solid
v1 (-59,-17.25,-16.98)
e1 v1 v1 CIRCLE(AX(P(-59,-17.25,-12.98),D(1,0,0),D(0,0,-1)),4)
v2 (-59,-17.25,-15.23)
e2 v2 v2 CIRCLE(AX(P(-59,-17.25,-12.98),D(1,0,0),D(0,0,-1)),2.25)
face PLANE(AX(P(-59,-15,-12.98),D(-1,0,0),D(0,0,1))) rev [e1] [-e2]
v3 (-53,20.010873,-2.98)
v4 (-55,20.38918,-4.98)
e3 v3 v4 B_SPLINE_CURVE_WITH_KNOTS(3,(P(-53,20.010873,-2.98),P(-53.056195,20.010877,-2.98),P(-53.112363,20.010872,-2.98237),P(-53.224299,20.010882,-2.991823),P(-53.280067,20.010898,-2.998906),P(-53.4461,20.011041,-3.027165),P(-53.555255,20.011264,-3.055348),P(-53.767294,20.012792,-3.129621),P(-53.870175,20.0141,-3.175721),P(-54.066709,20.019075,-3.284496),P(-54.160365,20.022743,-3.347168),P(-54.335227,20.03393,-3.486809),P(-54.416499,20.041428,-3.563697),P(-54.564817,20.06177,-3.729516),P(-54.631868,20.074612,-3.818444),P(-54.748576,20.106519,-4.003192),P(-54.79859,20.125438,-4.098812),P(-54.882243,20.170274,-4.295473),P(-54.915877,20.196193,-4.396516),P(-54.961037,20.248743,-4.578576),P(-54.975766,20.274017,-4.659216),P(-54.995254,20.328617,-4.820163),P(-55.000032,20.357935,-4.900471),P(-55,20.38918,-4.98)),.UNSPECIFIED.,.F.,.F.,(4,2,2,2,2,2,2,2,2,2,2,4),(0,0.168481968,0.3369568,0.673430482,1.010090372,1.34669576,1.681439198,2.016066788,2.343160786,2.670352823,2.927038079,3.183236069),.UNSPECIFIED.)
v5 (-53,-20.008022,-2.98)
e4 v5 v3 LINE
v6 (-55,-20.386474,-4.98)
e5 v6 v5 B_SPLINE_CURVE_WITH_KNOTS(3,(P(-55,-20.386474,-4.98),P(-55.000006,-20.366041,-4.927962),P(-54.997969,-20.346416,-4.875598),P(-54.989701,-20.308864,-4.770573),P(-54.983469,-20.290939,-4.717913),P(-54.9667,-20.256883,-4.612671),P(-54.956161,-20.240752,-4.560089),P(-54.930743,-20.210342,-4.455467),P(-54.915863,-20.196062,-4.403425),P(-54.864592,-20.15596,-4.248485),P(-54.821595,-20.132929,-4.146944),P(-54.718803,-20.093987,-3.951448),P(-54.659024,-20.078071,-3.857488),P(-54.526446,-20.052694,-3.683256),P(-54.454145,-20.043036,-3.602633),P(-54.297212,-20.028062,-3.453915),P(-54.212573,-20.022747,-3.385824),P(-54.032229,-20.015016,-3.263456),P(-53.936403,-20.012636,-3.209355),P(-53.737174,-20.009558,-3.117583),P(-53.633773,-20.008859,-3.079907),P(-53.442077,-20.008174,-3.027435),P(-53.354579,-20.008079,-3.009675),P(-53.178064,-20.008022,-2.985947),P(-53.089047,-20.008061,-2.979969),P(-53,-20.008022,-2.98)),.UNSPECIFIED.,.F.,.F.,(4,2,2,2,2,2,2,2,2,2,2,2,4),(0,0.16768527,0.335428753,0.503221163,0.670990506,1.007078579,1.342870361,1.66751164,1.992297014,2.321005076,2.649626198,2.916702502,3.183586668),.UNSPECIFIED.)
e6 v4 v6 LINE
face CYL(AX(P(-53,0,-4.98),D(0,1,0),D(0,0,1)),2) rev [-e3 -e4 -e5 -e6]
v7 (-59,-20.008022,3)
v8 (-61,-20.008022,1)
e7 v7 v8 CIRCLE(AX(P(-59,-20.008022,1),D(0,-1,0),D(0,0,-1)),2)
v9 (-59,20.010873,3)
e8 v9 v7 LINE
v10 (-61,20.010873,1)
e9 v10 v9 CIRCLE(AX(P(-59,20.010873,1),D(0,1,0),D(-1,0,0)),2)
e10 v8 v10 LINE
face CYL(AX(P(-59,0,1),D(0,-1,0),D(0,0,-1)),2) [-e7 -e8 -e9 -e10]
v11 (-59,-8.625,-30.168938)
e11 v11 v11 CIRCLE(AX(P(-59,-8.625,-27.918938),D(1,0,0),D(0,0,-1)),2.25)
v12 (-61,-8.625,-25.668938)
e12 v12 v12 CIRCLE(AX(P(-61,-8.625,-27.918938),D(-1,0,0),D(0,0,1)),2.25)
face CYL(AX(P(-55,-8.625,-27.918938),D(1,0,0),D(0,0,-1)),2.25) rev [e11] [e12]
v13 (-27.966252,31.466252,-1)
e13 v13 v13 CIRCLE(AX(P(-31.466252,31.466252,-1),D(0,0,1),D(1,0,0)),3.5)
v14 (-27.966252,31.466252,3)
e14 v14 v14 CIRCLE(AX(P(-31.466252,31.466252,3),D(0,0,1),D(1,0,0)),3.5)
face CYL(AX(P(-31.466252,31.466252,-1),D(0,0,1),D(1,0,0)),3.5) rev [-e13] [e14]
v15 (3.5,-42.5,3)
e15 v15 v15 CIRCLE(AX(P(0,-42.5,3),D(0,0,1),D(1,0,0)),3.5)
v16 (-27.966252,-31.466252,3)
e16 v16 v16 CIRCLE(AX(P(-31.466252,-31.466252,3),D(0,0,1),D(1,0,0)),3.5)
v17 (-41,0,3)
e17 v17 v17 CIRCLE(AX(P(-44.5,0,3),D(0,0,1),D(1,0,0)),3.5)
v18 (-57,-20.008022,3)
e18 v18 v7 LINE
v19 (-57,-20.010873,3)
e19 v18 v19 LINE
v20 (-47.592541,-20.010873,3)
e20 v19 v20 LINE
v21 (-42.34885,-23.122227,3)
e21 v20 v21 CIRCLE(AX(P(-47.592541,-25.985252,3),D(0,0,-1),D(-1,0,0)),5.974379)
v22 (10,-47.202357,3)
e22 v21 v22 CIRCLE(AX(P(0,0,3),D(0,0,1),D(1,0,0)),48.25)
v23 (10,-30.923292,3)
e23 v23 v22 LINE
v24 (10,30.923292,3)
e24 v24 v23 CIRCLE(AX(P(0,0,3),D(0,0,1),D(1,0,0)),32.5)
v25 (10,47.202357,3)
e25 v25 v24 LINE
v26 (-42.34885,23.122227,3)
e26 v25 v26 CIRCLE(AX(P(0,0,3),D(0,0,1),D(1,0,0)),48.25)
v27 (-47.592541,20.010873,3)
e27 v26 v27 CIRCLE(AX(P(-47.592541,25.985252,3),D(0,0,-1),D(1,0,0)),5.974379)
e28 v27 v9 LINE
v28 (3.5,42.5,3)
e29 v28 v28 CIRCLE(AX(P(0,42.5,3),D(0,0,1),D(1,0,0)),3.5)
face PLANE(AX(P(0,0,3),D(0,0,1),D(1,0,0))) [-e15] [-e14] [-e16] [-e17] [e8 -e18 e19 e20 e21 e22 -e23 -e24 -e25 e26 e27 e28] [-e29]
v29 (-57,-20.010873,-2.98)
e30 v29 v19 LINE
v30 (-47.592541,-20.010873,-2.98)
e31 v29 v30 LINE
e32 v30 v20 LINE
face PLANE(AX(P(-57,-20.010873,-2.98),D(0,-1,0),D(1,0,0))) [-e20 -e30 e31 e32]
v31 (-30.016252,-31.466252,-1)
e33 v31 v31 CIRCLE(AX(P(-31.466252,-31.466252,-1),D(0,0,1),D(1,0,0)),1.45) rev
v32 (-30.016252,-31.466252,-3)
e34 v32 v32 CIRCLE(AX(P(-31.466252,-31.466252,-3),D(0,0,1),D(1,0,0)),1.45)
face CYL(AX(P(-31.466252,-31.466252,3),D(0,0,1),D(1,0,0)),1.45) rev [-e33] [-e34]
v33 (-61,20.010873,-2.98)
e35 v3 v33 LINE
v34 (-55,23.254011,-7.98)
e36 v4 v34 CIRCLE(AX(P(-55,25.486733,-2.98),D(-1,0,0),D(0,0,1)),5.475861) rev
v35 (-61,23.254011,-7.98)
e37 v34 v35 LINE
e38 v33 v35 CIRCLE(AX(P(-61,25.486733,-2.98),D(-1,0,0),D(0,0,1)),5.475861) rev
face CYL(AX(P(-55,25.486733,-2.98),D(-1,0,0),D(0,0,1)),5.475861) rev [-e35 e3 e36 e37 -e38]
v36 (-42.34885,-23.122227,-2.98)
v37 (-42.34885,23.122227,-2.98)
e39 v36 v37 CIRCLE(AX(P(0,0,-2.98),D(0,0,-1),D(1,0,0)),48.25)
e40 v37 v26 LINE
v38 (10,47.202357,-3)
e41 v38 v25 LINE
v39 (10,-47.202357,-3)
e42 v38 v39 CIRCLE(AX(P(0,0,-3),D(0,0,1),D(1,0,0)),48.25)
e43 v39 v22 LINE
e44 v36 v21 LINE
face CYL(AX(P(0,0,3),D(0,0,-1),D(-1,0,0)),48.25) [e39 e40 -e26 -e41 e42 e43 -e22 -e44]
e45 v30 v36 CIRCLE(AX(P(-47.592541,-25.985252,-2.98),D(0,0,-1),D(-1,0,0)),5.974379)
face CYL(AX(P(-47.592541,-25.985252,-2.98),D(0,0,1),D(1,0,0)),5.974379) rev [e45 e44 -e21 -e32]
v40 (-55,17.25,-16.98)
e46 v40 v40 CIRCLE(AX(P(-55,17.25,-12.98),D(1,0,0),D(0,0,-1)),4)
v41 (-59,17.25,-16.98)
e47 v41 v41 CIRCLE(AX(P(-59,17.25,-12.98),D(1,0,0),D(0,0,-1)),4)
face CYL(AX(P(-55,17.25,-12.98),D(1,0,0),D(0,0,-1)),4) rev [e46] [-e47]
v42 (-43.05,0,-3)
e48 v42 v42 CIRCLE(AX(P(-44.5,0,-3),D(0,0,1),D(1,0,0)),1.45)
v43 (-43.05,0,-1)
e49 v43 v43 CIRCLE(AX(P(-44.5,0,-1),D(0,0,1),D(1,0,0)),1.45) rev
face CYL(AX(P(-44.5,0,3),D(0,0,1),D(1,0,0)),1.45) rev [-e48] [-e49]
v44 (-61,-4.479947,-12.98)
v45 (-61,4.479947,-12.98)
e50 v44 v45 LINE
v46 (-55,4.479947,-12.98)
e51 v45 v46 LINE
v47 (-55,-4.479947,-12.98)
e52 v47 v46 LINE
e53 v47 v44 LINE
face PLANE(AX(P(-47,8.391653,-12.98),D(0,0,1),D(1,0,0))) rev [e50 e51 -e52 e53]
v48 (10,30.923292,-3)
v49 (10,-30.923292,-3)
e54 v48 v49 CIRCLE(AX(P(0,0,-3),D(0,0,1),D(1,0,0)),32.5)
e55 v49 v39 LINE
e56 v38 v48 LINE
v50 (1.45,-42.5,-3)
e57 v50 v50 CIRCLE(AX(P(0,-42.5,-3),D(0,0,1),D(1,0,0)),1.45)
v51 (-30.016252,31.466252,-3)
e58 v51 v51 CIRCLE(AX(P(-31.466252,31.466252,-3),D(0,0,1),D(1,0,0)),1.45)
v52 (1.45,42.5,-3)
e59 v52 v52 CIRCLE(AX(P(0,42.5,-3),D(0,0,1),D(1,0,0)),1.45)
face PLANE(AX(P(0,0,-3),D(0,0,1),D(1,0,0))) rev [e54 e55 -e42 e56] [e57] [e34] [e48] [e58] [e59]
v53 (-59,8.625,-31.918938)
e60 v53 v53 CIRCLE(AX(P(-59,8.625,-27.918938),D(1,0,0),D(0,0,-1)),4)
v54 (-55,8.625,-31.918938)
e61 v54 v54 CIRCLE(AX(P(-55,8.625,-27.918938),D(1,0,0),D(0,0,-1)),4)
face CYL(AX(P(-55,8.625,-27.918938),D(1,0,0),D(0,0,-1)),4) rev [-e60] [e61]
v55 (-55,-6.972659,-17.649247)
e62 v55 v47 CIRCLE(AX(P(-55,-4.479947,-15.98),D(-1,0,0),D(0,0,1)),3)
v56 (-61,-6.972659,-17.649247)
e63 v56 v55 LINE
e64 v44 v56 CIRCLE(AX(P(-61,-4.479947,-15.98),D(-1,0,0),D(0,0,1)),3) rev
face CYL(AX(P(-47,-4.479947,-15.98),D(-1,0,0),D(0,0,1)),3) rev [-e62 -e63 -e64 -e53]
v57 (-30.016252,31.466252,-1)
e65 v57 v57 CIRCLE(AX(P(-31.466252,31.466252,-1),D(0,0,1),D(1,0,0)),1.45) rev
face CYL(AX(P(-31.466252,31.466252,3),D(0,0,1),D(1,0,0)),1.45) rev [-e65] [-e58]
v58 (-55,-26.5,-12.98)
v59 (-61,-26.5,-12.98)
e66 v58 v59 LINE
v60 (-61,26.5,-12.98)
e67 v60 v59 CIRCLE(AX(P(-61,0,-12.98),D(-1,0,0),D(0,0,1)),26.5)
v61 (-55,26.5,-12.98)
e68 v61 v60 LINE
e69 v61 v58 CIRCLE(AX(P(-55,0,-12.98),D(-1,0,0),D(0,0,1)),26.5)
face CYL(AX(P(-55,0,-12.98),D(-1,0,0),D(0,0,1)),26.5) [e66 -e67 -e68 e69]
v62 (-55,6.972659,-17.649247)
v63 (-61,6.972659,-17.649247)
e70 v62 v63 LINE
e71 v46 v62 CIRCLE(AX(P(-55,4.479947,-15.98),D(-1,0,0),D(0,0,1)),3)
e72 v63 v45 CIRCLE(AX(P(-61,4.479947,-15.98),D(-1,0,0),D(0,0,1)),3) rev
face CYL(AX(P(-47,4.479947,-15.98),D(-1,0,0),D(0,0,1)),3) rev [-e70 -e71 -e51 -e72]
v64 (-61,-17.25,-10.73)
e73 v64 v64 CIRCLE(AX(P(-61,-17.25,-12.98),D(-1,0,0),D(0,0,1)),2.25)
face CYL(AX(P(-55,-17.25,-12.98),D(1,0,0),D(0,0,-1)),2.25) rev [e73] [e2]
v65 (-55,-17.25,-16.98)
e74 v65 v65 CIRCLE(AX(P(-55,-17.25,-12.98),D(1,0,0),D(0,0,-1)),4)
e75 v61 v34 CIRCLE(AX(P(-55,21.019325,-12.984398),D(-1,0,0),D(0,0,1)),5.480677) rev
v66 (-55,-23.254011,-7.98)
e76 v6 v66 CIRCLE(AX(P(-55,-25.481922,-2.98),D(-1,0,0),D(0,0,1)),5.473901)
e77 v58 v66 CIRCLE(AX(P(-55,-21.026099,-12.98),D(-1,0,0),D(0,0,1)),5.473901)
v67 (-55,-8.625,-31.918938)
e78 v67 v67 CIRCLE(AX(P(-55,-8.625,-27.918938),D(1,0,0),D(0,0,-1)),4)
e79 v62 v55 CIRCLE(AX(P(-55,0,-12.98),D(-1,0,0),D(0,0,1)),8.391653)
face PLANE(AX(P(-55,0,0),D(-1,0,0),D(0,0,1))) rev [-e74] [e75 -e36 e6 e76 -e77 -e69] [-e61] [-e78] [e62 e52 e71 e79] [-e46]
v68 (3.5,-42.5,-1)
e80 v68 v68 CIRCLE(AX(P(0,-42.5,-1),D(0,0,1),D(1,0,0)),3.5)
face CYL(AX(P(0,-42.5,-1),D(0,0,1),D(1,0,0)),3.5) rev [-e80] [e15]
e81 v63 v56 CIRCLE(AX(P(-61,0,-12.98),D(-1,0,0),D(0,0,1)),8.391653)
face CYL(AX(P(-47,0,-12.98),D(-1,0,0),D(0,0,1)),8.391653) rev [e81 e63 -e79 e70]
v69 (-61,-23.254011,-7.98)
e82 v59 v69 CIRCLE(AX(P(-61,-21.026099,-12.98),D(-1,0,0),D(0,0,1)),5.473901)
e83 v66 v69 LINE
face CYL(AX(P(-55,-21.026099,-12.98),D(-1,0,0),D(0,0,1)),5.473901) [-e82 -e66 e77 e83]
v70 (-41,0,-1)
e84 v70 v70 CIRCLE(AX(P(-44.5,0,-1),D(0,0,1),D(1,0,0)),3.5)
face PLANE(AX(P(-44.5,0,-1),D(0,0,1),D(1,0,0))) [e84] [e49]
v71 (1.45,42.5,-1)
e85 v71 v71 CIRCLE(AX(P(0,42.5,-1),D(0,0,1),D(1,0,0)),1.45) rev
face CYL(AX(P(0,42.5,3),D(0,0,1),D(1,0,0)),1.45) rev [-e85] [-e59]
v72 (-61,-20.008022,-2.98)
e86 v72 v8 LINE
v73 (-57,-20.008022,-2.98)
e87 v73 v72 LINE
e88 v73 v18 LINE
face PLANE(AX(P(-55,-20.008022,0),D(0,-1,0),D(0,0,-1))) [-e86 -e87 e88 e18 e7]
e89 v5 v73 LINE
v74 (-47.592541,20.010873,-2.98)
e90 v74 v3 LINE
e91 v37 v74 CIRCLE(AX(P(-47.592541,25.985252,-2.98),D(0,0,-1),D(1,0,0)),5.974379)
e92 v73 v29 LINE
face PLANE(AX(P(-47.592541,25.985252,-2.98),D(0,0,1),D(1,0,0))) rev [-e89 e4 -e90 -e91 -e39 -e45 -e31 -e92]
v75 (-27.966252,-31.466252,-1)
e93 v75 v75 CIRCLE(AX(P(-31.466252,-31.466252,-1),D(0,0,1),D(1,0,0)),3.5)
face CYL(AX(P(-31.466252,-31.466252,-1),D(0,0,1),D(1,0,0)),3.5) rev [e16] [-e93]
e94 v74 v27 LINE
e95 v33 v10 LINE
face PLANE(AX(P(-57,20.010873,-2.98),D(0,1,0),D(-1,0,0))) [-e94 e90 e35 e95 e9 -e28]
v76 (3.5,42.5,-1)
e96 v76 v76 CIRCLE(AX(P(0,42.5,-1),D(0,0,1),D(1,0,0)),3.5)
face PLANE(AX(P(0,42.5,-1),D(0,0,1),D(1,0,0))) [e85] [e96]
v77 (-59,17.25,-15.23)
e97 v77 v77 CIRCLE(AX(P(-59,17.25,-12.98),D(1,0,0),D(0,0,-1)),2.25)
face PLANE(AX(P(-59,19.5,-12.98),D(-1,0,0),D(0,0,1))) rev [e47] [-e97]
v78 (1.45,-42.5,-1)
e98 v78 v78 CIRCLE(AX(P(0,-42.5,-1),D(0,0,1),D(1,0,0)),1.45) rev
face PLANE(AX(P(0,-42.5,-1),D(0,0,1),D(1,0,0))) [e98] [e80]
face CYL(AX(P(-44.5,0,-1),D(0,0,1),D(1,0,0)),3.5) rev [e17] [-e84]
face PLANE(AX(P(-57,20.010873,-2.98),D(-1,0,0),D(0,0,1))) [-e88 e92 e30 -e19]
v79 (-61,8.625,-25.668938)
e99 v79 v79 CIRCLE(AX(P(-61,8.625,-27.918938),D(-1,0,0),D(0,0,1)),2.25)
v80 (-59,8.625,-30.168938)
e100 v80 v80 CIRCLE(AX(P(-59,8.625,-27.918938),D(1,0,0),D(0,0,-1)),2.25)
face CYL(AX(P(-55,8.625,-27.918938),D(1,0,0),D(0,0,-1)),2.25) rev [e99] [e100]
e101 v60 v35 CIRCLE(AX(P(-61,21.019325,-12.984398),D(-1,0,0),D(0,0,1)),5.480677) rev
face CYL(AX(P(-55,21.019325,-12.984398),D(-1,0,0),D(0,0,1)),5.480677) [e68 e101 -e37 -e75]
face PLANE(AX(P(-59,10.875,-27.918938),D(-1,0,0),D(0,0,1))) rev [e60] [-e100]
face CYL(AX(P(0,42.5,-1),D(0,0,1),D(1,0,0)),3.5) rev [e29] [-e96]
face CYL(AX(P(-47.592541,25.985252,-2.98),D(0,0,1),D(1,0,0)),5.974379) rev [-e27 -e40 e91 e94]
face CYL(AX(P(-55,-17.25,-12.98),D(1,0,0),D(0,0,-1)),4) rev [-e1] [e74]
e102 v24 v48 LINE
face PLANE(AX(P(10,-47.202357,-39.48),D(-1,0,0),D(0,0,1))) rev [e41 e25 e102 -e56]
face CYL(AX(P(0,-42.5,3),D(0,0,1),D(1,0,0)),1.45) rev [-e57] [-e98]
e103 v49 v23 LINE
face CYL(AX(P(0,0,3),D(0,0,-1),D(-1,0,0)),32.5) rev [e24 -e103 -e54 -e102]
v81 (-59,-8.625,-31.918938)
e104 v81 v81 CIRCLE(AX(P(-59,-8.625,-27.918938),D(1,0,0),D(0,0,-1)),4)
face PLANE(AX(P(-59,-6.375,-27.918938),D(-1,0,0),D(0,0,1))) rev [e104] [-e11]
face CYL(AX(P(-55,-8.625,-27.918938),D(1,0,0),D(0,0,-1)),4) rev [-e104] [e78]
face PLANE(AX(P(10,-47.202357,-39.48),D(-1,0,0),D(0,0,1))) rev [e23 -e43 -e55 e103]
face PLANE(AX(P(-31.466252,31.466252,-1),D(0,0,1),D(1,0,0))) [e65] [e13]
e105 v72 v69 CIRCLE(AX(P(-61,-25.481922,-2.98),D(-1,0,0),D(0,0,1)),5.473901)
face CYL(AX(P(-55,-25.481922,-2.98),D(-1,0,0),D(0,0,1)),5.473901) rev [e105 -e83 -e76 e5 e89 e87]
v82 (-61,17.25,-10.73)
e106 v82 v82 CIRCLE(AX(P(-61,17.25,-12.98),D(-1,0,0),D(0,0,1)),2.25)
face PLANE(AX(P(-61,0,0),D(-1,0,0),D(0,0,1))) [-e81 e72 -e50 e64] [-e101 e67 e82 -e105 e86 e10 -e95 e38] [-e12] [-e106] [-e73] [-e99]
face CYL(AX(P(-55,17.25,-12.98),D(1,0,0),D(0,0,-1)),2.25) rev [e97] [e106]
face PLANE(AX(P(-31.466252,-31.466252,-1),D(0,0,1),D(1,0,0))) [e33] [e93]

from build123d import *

# Parameters (mm, degrees)
SKETCH_3_R                   = 48.25
SKETCH_3_R_2                 = 32.5
EXTRUDE_2_DEPTH              = 3
SKETCH_5_R                   = 41.525287223
SKETCH_5_R_2                 = 39.197474278
EXTRUDE_3_DEPTH              = 0.1
EXTRUDE_START                = -3
SKETCH_2_R                   = 48.25
SKETCH_2_R_2                 = 32.5
EXTRUDE_1_DEPTH              = 3
EXTRUDE_5_DEPTH              = 3
EXTRUDE_5_DEPTH_BACK         = 2.98
HOLE_WIZARD_M3_5_1_D         = 2.9
EXTRUDE_7_DEPTH              = 4
EXTRUDE_7_DEPTH_BACK         = 2
CUT_EXTRUDE_10_DEPTH         = 88.222318818
CUT_EXTRUDE_10_DEPTH_BACK    = 88.222318818
HOLE_WIZARD_M4_3_D           = 4.5
HOLE_WIZARD_M4_3_CBORE_D     = 8
HOLE_WIZARD_M4_3_CBORE_DEPTH = 4
FILLET_1_R                   = 2
CUT_EXTRUDE_11_DEPTH         = 10
CUT_EXTRUDE_11_DEPTH_BACK    = 10
FILLET_2_R                   = 3
SKETCH_33_R                  = 3.5
CUT_EXTRUDE_12_DEPTH         = 4
FILLET_5_R                   = 2


with BuildPart() as part:
    # 草图3 → 凸台-拉伸2 (new body)
    with BuildSketch(Plane.XY):
        Circle(SKETCH_3_R)
        Circle(SKETCH_3_R_2, mode=Mode.SUBTRACT)
    extrude(amount=EXTRUDE_2_DEPTH)

    # 草图5 → 凸台-拉伸3 (add)
    with BuildSketch(Plane.XY.offset(3)):
        Circle(SKETCH_5_R)
        Circle(SKETCH_5_R_2, mode=Mode.SUBTRACT)
    extrude(amount=-EXTRUDE_3_DEPTH)

    # 草图2 → 凸台-拉伸1 (add)
    with BuildSketch(Plane.XY.offset(EXTRUDE_START)):
        Circle(SKETCH_2_R)
        Circle(SKETCH_2_R_2, mode=Mode.SUBTRACT)
    extrude(amount=EXTRUDE_1_DEPTH)

    # 草图8 → 凸台-拉伸5 (add, two sides: drawn at the far end of the back side and taken through both)
    with BuildSketch(Plane.XY.offset(-EXTRUDE_5_DEPTH_BACK)):
        with BuildLine():
            Line((-57, 20.010872518), (-47.592541309, 20.010872518))
            ThreePointArc((-47.592541309, 20.010872518), (-44.543901449, 20.847255835), (-42.348850377, 23.12222679))
            ThreePointArc((-42.348850377, 23.12222679), (-48.25, 0), (-42.348850377, -23.12222679))
            ThreePointArc((-42.348850377, -23.12222679), (-44.543901449, -20.847255835), (-47.592541309, -20.010872518))
            Line((-47.592541309, -20.010872518), (-57, -20.010872518))
            Line((-57, -20.010872518), (-57, 20.010872518))
        make_face()
    extrude(amount=EXTRUDE_5_DEPTH + EXTRUDE_5_DEPTH_BACK)

    # M3.5 螺纹孔的螺纹孔钻头1 (through all)
    with Locations(Plane(origin=(31.466251763, 31.466251763, 3), x_dir=(1, 0, 0), z_dir=(0, 0, 1))):
        with Locations((0, 0), (13.033748237, -31.466251763), (0, -62.932503526), (-62.932503526, -62.932503526), (-75.966251763, -31.466251763), (-62.932503526, 0), (-31.466251763, -73.966251763), (-31.466251763, 11.033748237)):
            Hole(HOLE_WIZARD_M3_5_1_D / 2)

    # 草图26 → 凸台-拉伸7 (add, two sides: drawn at the far end of the back side and taken through both)
    with BuildSketch(Plane.ZY.offset(57).offset(-EXTRUDE_7_DEPTH_BACK)):
        with BuildLine():
            ThreePointArc((-12.98, 26.5), (-39.48, 0), (-12.98, -26.5))
            ThreePointArc((-12.98, -26.5), (-9.999377331, -25.617338519), (-7.98, -23.254010785))
            ThreePointArc((-7.98, -23.254010785), (-5.960622669, -20.89068305), (-2.98, -20.008021569))
            Line((-2.98, -20.008021569), (3, -20.008021569))
            Line((3, -20.008021569), (3, 20.010872518))
            Line((3, 20.010872518), (-2.98, 20.010872518))
            ThreePointArc((-2.98, 20.010872518), (-5.959846717, 20.892654018), (-7.98, 23.254010785))
            ThreePointArc((-7.98, 23.254010785), (-10.000085555, 25.616247597), (-12.98, 26.5))
        make_face()
    extrude(amount=EXTRUDE_7_DEPTH + EXTRUDE_7_DEPTH_BACK)

    # 草图27 → 切除-拉伸10 (cut, two sides: drawn at the far end of the back side and taken through both)
    with BuildSketch(Plane.XY.offset(-CUT_EXTRUDE_10_DEPTH_BACK)):
        with BuildLine():
            Line((10, -47.202356933), (10, 47.202356933))
            ThreePointArc((10, 47.202356933), (48.25, 0), (10, -47.202356933))
        make_face()
    extrude(amount=CUT_EXTRUDE_10_DEPTH + CUT_EXTRUDE_10_DEPTH_BACK, mode=Mode.SUBTRACT)

    # M4 六角凹头盖的柱孔3 (through all)
    with Locations(Plane(origin=(-55, 17.25, -12.98), x_dir=(0, 0, 1), z_dir=(1, 0, 0))):
        with Locations((0, 0), (-14.938938215, 8.625), (-14.938938215, 25.875), (0, 34.5)):
            CounterBoreHole(HOLE_WIZARD_M4_3_D / 2, HOLE_WIZARD_M4_3_CBORE_D / 2, HOLE_WIZARD_M4_3_CBORE_DEPTH)

    # 圆角1
    fillet_1_edges = [part.edges().sort_by_distance(p)[0] for p in [
        (-61, 0.001425474, 3),
    ]]
    fillet(fillet_1_edges, radius=FILLET_1_R)

    # 草图30 → 切除-拉伸11 (cut, two sides: drawn at the far end of the back side and taken through both)
    with BuildSketch(Plane.ZY.offset(57).offset(-CUT_EXTRUDE_11_DEPTH_BACK)):
        with BuildLine():
            Line((-12.98, 8.39165306), (-12.98, -8.39165306))
            ThreePointArc((-12.98, -8.39165306), (-21.37165306, 0), (-12.98, 8.39165306))
        make_face()
    extrude(amount=CUT_EXTRUDE_11_DEPTH + CUT_EXTRUDE_11_DEPTH_BACK, mode=Mode.SUBTRACT)

    # 圆角2
    fillet_2_edges = [part.edges().sort_by_distance(p)[0] for p in [
        (-58, -8.39165306, -12.98),
        (-58, 8.39165306, -12.98),
    ]]
    fillet(fillet_2_edges, radius=FILLET_2_R)

    # 草图33 → 切除-拉伸12 (cut)
    with BuildSketch(Plane.XY.offset(3)):
        with Locations((0, 42.5)):
            Circle(SKETCH_33_R)
        with Locations((0, -42.5)):
            Circle(SKETCH_33_R)
        with Locations((-31.466251763, 31.466251763)):
            Circle(SKETCH_33_R)
        with Locations((-44.5, 0)):
            Circle(SKETCH_33_R)
        with Locations((-31.466251763, -31.466251763)):
            Circle(SKETCH_33_R)
    extrude(amount=-CUT_EXTRUDE_12_DEPTH, mode=Mode.SUBTRACT)

    # 圆角5
    # the kernel refuses this fillet: 2 mm, written as the material it adds along each edge
    with BuildSketch(Plane(origin=(-55, -25.008021569, -2.98), x_dir=(0, 0, -1), z_dir=(0, 1, 0))) as fillet_5_piece_1_section:
        with BuildLine():
            CenterArc((FILLET_5_R, -FILLET_5_R), FILLET_5_R, 90, 90)
            Line((0, -FILLET_5_R), (0, 0))
            Line((0, 0), (FILLET_5_R, 0))
        make_face()
    fillet_5_piece_1 = extrude(amount=50.018894088, mode=Mode.PRIVATE)
    fillet_5_piece_1 = fillet_5_piece_1 - Plane(origin=(-54.891551476, 25.486733073, -2.98), x_dir=(0, -1, 0), z_dir=(1, 0, 0)) * Cylinder(5.475860555, 109, mode=Mode.PRIVATE)
    fillet_5_piece_1 = fillet_5_piece_1 - Plane(origin=(-54.891551476, -25.481922379, -2.98), x_dir=(0, 0.40700620484751754, -0.9134253933494627), z_dir=(1, 0, 0)) * Cylinder(5.473900809, 109, mode=Mode.PRIVATE)
    add(fillet_5_piece_1)


solid = part.part
